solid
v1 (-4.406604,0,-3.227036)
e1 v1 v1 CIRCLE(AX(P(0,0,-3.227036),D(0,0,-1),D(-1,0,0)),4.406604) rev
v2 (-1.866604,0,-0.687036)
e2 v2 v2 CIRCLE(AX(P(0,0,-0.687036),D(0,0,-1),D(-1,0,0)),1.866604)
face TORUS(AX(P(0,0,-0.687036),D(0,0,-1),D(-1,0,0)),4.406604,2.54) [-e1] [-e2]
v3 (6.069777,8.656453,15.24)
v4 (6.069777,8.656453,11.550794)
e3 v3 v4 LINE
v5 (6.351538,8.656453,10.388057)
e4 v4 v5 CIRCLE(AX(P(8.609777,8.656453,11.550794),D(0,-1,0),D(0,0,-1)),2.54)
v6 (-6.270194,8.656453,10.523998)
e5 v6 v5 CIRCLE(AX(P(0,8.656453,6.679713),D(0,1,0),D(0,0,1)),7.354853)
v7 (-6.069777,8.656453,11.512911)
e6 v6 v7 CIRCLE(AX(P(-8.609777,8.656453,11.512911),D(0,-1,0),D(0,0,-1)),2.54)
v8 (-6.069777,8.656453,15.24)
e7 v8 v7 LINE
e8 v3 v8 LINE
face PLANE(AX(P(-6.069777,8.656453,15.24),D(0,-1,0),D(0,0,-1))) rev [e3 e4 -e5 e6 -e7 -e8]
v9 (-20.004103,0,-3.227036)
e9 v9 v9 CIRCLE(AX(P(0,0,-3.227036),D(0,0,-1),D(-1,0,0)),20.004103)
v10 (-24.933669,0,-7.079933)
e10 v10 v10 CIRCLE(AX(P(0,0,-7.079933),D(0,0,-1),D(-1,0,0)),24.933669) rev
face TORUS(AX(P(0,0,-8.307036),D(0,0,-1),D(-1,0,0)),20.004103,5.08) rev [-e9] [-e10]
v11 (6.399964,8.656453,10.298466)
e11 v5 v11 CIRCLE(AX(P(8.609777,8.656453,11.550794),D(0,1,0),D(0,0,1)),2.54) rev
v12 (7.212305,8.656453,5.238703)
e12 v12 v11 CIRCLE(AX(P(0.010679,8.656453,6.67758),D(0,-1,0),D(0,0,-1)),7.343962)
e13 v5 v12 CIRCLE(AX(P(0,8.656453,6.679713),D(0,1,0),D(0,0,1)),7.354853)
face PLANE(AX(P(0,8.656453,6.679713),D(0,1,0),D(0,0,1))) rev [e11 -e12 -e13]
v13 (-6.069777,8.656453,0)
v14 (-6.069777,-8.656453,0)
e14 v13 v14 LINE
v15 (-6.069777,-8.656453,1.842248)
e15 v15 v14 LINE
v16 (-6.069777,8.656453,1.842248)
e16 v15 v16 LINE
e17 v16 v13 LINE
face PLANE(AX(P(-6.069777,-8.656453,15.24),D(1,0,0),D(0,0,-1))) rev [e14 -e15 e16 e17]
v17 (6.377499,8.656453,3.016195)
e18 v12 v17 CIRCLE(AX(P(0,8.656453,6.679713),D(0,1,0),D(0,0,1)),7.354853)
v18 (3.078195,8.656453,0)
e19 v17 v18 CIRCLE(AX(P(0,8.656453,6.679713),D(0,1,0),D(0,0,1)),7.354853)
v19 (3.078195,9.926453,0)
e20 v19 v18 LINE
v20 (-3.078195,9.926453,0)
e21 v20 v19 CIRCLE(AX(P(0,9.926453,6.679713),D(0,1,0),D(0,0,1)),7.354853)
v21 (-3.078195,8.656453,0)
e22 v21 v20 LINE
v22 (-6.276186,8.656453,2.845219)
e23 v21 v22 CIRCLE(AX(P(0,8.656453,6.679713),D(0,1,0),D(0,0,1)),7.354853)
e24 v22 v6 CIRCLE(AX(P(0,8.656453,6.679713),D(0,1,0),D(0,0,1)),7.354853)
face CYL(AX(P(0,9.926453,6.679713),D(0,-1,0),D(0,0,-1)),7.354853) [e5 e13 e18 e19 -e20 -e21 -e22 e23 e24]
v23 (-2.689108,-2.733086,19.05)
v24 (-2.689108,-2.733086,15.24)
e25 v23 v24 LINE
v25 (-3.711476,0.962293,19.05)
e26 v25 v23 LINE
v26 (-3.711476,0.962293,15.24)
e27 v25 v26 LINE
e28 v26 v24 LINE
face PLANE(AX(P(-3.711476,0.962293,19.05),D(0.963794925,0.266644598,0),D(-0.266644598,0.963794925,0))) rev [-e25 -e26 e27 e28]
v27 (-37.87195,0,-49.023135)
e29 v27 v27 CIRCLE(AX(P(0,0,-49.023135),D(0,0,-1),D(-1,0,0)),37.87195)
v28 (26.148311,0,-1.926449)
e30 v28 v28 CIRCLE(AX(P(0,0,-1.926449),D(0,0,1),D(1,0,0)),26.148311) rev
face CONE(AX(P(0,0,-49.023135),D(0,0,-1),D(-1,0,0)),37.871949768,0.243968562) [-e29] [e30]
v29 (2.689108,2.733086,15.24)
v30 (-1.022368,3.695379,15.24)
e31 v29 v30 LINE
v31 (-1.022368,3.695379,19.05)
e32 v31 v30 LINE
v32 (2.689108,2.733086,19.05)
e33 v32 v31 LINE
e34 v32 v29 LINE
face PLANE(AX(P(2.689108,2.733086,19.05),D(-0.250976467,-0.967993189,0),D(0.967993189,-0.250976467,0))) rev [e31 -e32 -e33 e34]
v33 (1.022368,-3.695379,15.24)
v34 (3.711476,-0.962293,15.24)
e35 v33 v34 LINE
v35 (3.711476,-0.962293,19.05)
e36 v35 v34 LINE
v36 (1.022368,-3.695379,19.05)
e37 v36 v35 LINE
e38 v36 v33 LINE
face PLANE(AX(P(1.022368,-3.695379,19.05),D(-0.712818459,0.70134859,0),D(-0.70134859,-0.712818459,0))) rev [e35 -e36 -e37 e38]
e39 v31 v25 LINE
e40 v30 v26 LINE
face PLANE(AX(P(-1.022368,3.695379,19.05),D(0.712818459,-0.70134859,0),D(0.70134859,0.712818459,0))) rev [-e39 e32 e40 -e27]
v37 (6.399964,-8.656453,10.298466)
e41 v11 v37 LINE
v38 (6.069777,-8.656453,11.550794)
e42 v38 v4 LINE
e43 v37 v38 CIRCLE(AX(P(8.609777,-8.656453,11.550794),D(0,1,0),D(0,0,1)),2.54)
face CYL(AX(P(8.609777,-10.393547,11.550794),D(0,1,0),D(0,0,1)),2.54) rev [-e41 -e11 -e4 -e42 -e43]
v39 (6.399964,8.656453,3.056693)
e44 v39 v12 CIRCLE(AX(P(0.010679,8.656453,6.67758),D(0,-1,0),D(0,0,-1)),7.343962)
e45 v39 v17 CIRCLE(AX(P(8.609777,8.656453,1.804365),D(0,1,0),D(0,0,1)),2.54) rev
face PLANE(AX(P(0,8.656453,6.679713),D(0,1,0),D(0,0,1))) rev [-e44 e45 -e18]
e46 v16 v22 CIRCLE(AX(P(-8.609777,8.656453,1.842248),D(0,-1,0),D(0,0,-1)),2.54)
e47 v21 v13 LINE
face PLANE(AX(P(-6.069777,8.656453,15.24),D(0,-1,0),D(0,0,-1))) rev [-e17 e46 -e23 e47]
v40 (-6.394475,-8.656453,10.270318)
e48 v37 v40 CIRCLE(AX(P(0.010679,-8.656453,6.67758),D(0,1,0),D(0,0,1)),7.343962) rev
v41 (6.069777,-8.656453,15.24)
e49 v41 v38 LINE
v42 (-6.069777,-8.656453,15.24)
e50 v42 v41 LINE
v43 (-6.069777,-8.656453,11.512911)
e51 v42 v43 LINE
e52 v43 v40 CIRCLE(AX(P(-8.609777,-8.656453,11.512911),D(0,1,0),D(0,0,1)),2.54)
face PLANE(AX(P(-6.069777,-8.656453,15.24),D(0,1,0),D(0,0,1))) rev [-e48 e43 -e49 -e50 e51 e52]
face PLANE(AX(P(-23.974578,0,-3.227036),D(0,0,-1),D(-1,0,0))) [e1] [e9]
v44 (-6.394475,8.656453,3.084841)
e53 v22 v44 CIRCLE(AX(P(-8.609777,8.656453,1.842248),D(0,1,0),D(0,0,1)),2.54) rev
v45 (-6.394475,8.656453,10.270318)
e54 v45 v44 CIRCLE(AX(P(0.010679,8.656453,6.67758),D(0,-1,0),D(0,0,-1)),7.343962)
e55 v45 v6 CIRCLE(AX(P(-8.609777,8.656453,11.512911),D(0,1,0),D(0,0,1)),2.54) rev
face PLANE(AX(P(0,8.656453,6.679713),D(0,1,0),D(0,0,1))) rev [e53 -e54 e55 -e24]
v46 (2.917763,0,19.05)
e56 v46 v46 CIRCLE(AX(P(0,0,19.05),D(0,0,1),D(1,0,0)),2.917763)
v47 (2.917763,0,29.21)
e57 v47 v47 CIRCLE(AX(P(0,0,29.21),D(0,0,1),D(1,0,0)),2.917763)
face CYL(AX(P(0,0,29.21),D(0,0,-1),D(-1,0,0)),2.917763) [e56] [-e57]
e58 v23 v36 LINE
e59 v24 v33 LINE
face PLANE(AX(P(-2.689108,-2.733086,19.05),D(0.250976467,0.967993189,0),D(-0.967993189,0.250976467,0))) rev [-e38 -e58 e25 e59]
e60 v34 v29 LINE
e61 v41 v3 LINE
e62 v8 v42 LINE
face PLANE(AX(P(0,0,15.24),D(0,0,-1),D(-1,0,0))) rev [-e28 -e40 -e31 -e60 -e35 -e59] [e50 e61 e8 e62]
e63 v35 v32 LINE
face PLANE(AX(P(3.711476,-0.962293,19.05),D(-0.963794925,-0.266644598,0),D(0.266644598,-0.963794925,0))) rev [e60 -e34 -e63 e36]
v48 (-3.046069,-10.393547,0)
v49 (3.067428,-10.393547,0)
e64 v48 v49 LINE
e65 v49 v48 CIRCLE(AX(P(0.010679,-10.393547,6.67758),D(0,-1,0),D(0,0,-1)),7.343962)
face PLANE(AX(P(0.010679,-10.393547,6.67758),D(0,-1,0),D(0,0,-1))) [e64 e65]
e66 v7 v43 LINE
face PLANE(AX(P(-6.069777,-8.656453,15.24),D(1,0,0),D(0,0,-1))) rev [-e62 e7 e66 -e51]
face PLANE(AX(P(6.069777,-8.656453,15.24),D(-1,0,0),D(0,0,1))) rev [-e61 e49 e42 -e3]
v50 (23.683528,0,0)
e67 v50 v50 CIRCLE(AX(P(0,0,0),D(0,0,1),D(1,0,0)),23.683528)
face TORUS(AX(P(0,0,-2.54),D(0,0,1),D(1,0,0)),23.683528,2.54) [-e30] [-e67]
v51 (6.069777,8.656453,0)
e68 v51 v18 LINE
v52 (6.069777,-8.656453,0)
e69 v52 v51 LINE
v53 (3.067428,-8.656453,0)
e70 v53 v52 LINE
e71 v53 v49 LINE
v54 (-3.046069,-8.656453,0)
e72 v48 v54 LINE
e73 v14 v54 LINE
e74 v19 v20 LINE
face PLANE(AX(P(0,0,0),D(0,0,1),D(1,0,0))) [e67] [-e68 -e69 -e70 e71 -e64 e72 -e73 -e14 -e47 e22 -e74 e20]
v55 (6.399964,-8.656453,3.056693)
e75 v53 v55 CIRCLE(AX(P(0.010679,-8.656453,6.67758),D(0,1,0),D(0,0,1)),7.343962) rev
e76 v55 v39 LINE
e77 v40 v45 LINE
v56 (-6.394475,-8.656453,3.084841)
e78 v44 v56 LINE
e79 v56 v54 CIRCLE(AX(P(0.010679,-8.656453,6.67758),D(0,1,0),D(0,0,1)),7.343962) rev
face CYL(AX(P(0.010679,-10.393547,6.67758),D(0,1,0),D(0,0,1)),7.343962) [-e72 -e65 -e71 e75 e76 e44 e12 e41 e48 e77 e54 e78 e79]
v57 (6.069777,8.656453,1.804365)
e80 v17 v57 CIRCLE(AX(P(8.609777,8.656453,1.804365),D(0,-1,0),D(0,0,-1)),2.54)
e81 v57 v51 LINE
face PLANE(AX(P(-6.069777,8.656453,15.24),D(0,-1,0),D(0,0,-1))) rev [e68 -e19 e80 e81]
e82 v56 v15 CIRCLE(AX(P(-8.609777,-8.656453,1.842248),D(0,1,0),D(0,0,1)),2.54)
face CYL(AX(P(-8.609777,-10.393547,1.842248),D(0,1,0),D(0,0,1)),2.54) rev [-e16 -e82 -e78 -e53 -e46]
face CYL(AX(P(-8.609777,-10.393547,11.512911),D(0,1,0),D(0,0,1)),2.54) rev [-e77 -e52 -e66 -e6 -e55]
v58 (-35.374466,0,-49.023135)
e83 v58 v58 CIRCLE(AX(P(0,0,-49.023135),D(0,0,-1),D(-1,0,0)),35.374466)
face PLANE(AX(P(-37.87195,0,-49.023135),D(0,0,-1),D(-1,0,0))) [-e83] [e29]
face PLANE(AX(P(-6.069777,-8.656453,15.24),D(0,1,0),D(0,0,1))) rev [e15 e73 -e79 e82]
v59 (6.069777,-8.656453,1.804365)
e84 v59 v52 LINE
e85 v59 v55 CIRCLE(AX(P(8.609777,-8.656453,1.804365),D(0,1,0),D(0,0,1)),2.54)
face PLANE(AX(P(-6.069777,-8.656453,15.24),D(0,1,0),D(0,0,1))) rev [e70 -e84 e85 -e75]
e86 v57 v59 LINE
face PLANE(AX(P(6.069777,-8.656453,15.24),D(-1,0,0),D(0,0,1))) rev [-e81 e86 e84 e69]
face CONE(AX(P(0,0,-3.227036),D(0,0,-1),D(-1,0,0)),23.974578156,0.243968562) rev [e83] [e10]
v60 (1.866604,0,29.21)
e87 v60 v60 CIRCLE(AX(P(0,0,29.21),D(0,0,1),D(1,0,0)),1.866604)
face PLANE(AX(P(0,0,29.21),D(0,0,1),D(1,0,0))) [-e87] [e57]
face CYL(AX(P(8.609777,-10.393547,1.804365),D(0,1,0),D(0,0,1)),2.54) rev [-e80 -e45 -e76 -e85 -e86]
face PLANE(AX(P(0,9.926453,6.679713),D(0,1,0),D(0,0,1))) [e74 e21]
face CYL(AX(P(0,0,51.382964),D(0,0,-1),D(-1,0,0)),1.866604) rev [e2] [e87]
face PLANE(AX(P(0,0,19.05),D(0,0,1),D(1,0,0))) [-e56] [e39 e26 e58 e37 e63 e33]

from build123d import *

# Parameters (mm, degrees)
SKETCH2_W           = 12.139554842
SKETCH2_H           = 17.312906794
BOSS_EXTRUDE1_DEPTH = 15.24
SKETCH3_R           = 7.354852585
BOSS_EXTRUDE2_DEPTH = 1.27
SKETCH4_R           = 7.343962116
BOSS_EXTRUDE3_DEPTH = 19.05
FILLET1_R           = 5.08
FILLET2_R           = 2.54
SKETCH5_R           = 2.9177626
BOSS_EXTRUDE4_DEPTH = 13.97
BOSS_EXTRUDE5_DEPTH = 3.81
FILLET3_R           = 2.54
SKETCH8_R           = 1.866604038
CUT_EXTRUDE1_DEPTH  = 54.61
FILLET4_R           = 2.54


with BuildPart() as part:
    # Sketch1 → Revolve1 (revolve)
    with BuildSketch(Plane(origin=(0, 0, 0), x_dir=(1, 0, 0), z_dir=(0, 1, 0))):
        Polygon((0, 0), (-25.668765954, 0), (-37.871949768, 49.023134977), (-35.374465572, 49.023134977), (-23.974578156, 3.227035533), (0, 3.227035533), align=None)
    revolve(axis=Axis((0, 0, -3.227035533), (0, 0, 1)))

    # Sketch2 → Boss-Extrude1 (add)
    with BuildSketch(Plane.XY):
        Rectangle(SKETCH2_W, SKETCH2_H)
    extrude(amount=BOSS_EXTRUDE1_DEPTH)

    # Sketch3 → Boss-Extrude2 (add)
    with BuildSketch(Plane(origin=(0, 8.656453397, 0), x_dir=(1, 0, 0), z_dir=(0, 1, 0))):
        with Locations((0, -6.679713392)):
            Circle(SKETCH3_R)
    extrude(amount=BOSS_EXTRUDE2_DEPTH)

    # Sketch4 → Boss-Extrude3 (add)
    with BuildSketch(Plane.XZ.offset(-8.656453397)):
        with Locations((0.010679396, 6.67757966)):
            Circle(SKETCH4_R)
    extrude(amount=BOSS_EXTRUDE3_DEPTH)

    # Fillet1
    fillet1_edges = [part.edges().sort_by_distance(p)[0] for p in [
        (23.974578156, 0, -3.227035533),
    ]]
    fillet(fillet1_edges, radius=FILLET1_R)

    # Fillet2
    fillet2_edges = [part.edges().sort_by_distance(p)[0] for p in [
        (25.668765954, 0, 0),
    ]]
    fillet(fillet2_edges, radius=FILLET2_R)

    # Sketch5 → Boss-Extrude4 (add)
    with BuildSketch(Plane.XY.offset(15.24)):
        Circle(SKETCH5_R)
    extrude(amount=BOSS_EXTRUDE4_DEPTH)

    # Sketch6 → Boss-Extrude5 (add)
    with BuildSketch(Plane.XY.offset(15.24)):
        Polygon((1.022367717, -3.695378883), (3.711475848, -0.962293026), (2.689108131, 2.733085857), (-1.022367717, 3.695378883), (-3.711475848, 0.962293026), (-2.689108131, -2.733085857), align=None)
    extrude(amount=BOSS_EXTRUDE5_DEPTH)

    # Fillet3
    # the kernel refuses this fillet: 2.54 mm, written as the material it adds along each edge
    with BuildSketch(Plane(origin=(6.069777421, -8.656453397, 2.527747051), x_dir=(0, 0, -1), z_dir=(0, 1, 0))) as fillet3_piece_1:
        with BuildLine():
            CenterArc((0.723381963, -2.54), FILLET3_R, 90, 29.540761072)
            ThreePointArc((-0.52894629, -0.330186898), (-0.260967221, -0.170709801), (0, 0))
            Line((0, 0), (0.723381963, 0))
        make_face()
    extrude(amount=17.312906794)
    with BuildSketch(Plane(origin=(6.069777421, -8.656453397, 10.827412269), x_dir=(0.5295323324681384, 0, -0.8482897552551564), z_dir=(0, 1, 0))) as fillet3_piece_2:
        with BuildLine():
            CenterArc((0.731374616, -2.537710116), FILLET3_R, 92.433100789, 29.540761072)
            Line((-0.613637508, -0.383054138), (0, 0))
            ThreePointArc((0, 0), (0.311772179, -0.006620794), (0.623544358, 0))
        make_face()
    extrude(amount=17.312906794)
    with BuildSketch(Plane(origin=(-6.069777421, -8.656453397, 10.796053219), x_dir=(-0.5254687488151466, 0, -0.8508129018877444), z_dir=(0, 1, 0))) as fillet3_piece_3:
        with BuildLine():
            CenterArc((0.724778579, 2.537751252), FILLET3_R, 238.300195445, 29.288660156)
            Line((-0.609912043, 0.376686481), (0, 0))
            ThreePointArc((0, 0), (0.308960404, 0.006501859), (0.617920808, 0))
        make_face()
    extrude(amount=17.312906794)
    with BuildSketch(Plane(origin=(-6.069777421, -8.656453397, 2.559106101), x_dir=(-0.5254687488151472, 0, 0.8508129018877438), z_dir=(0, 1, 0))) as fillet3_piece_4:
        with BuildLine():
            CenterArc((0.724778579, -2.537751252), FILLET3_R, 92.411144399, 29.288660156)
            Line((-0.609912043, -0.376686481), (0, 0))
            ThreePointArc((0, 0), (0.308960404, -0.006501859), (0.617920808, 0))
        make_face()
    extrude(amount=17.312906794)

    # Sketch8 → Cut-Extrude1 (cut)
    with BuildSketch(Plane(origin=(0, 0, -3.227035533), x_dir=(-1, 0, 0), z_dir=(0, 0, -1))):
        Circle(SKETCH8_R)
    extrude(amount=-CUT_EXTRUDE1_DEPTH, mode=Mode.SUBTRACT)

    # Fillet4
    fillet4_edges = [part.edges().sort_by_distance(p)[0] for p in [
        (1.866604038, 0, -3.227035533),
    ]]
    fillet(fillet4_edges, radius=FILLET4_R)


solid = part.part
